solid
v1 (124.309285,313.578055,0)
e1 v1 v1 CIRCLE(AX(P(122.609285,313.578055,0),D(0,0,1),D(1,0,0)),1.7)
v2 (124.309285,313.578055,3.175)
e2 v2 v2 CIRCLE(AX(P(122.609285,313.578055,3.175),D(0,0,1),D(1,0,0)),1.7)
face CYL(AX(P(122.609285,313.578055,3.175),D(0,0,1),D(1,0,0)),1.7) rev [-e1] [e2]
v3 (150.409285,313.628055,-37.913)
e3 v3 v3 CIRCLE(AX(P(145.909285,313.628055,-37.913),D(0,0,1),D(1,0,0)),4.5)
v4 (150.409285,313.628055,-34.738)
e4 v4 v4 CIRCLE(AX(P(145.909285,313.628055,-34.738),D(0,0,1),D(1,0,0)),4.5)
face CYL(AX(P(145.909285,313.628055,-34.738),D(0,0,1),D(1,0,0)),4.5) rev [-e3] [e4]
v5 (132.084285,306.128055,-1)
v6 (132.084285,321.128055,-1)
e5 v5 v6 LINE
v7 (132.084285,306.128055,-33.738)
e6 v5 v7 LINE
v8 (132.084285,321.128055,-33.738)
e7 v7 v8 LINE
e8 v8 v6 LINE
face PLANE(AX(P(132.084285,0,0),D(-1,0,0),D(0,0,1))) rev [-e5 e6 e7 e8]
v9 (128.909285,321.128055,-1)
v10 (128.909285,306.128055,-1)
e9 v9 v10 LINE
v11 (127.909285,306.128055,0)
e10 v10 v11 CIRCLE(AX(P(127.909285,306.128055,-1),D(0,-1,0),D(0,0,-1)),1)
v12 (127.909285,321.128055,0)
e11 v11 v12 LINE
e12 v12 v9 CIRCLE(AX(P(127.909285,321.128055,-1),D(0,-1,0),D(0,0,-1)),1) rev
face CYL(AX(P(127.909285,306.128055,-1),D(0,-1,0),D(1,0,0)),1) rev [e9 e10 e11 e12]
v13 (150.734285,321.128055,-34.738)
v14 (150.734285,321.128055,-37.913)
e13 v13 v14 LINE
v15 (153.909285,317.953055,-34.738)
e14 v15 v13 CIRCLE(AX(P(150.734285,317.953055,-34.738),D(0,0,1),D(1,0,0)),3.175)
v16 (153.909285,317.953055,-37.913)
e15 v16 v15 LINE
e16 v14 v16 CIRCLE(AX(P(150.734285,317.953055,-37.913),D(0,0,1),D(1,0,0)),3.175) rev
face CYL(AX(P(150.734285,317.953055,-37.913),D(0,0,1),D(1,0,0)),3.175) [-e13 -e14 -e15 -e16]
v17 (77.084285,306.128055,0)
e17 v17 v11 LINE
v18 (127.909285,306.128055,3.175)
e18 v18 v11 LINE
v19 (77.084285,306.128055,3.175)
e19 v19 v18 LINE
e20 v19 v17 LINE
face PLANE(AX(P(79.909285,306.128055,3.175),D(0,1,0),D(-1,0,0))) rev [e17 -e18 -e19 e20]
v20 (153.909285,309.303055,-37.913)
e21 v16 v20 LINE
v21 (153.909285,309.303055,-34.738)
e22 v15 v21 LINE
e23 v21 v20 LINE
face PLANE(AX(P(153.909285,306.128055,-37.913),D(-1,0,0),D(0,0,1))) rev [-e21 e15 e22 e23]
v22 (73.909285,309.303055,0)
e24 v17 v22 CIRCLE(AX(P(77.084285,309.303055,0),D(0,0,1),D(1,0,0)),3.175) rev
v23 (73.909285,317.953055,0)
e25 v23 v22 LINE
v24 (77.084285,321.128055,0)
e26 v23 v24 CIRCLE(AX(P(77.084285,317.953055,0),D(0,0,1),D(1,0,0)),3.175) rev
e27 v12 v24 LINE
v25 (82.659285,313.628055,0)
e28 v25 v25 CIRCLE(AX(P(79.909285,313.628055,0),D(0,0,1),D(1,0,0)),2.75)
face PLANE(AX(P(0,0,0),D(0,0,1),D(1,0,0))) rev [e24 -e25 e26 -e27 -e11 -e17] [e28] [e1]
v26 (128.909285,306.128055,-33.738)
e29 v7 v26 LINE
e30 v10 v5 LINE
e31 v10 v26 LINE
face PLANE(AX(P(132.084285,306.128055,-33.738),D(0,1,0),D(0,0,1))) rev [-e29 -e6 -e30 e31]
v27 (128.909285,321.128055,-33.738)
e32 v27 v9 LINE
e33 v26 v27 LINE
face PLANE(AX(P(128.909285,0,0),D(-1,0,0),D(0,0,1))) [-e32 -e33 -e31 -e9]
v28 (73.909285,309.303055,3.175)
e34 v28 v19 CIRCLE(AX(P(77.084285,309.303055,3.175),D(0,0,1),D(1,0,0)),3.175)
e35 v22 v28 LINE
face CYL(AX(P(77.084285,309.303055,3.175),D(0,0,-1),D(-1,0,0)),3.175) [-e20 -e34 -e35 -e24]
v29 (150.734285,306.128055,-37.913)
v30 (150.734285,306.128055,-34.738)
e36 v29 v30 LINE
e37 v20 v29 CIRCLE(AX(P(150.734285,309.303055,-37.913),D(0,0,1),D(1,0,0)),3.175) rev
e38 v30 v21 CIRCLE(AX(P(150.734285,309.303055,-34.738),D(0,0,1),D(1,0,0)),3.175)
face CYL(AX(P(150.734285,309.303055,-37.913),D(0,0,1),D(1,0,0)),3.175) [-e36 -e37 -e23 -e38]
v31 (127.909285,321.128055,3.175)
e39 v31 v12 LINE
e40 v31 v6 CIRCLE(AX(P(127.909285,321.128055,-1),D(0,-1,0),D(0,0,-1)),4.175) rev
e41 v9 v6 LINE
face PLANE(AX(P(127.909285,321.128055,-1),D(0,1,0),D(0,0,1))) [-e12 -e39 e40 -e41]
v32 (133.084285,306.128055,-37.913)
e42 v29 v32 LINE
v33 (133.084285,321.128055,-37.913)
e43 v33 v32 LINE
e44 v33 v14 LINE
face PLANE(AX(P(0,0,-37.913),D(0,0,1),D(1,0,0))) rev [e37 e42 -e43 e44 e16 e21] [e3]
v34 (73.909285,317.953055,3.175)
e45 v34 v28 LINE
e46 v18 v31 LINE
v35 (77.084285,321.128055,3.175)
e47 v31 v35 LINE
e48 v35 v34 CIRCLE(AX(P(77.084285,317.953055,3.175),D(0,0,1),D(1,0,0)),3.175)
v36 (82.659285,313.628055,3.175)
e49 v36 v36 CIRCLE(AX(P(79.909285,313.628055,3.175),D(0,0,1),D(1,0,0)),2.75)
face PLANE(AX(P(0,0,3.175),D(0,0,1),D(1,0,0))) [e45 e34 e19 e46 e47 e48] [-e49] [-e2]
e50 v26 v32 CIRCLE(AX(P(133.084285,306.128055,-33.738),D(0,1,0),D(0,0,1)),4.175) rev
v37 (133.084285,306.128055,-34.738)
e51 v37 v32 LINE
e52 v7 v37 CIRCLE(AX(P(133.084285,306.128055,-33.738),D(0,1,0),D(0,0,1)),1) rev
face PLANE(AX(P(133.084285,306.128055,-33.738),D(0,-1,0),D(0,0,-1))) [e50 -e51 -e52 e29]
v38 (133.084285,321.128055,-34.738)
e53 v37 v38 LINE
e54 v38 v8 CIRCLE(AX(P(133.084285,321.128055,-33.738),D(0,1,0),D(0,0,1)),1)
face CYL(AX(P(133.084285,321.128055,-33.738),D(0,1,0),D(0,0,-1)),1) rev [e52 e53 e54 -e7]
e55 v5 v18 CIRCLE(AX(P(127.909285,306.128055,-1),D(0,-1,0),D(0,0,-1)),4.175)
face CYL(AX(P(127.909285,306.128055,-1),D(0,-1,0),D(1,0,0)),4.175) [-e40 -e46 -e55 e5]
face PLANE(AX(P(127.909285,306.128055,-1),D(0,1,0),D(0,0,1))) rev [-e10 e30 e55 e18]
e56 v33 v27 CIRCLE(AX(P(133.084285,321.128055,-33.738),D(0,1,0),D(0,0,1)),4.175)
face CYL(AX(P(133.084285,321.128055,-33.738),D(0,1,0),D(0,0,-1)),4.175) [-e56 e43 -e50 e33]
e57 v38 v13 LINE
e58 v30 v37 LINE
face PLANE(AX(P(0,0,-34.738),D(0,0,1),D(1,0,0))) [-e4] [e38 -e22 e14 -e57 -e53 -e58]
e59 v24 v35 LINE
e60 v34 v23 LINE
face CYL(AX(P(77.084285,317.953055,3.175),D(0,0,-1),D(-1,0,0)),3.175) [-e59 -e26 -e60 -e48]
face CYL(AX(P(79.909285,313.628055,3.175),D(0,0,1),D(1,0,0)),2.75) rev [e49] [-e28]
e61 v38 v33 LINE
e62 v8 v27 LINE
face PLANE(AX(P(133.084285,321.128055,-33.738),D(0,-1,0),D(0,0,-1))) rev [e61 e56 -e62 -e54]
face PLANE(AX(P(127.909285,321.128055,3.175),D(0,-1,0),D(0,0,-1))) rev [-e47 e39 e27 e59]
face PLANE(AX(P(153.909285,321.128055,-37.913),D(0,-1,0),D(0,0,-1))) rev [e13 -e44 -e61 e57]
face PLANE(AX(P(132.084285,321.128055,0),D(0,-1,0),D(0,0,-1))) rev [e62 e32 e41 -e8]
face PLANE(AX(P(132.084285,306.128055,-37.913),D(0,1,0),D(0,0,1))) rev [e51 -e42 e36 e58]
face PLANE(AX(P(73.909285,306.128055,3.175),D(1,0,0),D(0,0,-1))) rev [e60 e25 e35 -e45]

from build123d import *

# Parameters (mm, degrees)
BASE_FLANGE1_DEPTH   = 3.175
EDGE_FLANGE1_DEPTH   = 15
EDGE_FLANGE2_DEPTH   = 15
M5_CLEARANCE_HOLE1_D = 5.5
M8_CLEARANCE_HOLE1_D = 9
FILLET1_R            = 3.175
M3_CLEARANCE_HOLE1_D = 3.4


# Sheet-metal steps are written as plain solids
with BuildPart() as part:
    # Sketch2 → Base-Flange1 (new body)
    with BuildSketch(Plane.XY):
        Polygon((79.909284585, 306.128054742), (73.909284585, 306.128054742), (73.909284585, 321.128054742), (79.909284585, 321.128054742), (127.909284585, 321.128054742), (127.909284585, 306.128054742), align=None)
    extrude(amount=BASE_FLANGE1_DEPTH)

    # Edge-Flange1 section (across the edge) → Edge-Flange1 (add)
    with BuildSketch(Plane(origin=(128.909284585, 321.128054742, 0), x_dir=(-1, 0, 0), z_dir=(0, -1, 0))):
        with BuildLine():
            Line((-3.175, 1), (-3.175, 33.738))
            Line((-3.175, 33.738), (0, 33.738))
            Line((0, 33.738), (0, 1))
            ThreePointArc((0, 1), (0.292893219, 0.292893219), (1, 0))
            Line((1, 0), (1, -3.175))
            ThreePointArc((1, -3.175), (-1.952170811, -1.952170811), (-3.175, 1))
        make_face()
    extrude(amount=EDGE_FLANGE1_DEPTH)

    # Edge-Flange2 section (across the edge) → Edge-Flange2 (add)
    with BuildSketch(Plane(origin=(132.084284585, 306.128054742, -34.738), x_dir=(0, 0, 1), z_dir=(0, 1, 0))):
        with BuildLine():
            Line((-3.175, 1), (-3.175, 21.825))
            Line((-3.175, 21.825), (0, 21.825))
            Line((0, 21.825), (0, 1))
            ThreePointArc((0, 1), (0.292893219, 0.292893219), (1, 0))
            Line((1, 0), (1, -3.175))
            ThreePointArc((1, -3.175), (-1.952170811, -1.952170811), (-3.175, 1))
        make_face()
    extrude(amount=EDGE_FLANGE2_DEPTH)

    # M5 Clearance Hole1 (through all)
    with Locations(Plane.XY.offset(3.175)):
        with Locations((79.909284585, 313.628054742)):
            Hole(M5_CLEARANCE_HOLE1_D / 2)

    # M8 Clearance Hole1 (through all)
    with Locations(Plane.XY.offset(-34.738)):
        with Locations((145.909284585, 313.628054742)):
            Hole(M8_CLEARANCE_HOLE1_D / 2)

    # Fillet1
    fillet1_edges = [part.edges().sort_by_distance(p)[0] for p in [
        (73.909284585, 306.128054742, 1.5875),
        (73.909284585, 321.128054742, 1.5875),
        (153.909284585, 306.128054742, -36.3255),
        (153.909284585, 321.128054742, -36.3255),
    ]]
    fillet(fillet1_edges, radius=FILLET1_R)

    # M3 Clearance Hole1 (through all)
    with Locations(Plane.XY.offset(3.175)):
        with Locations((122.609284585, 313.578054742)):
            Hole(M3_CLEARANCE_HOLE1_D / 2)


solid = part.part
